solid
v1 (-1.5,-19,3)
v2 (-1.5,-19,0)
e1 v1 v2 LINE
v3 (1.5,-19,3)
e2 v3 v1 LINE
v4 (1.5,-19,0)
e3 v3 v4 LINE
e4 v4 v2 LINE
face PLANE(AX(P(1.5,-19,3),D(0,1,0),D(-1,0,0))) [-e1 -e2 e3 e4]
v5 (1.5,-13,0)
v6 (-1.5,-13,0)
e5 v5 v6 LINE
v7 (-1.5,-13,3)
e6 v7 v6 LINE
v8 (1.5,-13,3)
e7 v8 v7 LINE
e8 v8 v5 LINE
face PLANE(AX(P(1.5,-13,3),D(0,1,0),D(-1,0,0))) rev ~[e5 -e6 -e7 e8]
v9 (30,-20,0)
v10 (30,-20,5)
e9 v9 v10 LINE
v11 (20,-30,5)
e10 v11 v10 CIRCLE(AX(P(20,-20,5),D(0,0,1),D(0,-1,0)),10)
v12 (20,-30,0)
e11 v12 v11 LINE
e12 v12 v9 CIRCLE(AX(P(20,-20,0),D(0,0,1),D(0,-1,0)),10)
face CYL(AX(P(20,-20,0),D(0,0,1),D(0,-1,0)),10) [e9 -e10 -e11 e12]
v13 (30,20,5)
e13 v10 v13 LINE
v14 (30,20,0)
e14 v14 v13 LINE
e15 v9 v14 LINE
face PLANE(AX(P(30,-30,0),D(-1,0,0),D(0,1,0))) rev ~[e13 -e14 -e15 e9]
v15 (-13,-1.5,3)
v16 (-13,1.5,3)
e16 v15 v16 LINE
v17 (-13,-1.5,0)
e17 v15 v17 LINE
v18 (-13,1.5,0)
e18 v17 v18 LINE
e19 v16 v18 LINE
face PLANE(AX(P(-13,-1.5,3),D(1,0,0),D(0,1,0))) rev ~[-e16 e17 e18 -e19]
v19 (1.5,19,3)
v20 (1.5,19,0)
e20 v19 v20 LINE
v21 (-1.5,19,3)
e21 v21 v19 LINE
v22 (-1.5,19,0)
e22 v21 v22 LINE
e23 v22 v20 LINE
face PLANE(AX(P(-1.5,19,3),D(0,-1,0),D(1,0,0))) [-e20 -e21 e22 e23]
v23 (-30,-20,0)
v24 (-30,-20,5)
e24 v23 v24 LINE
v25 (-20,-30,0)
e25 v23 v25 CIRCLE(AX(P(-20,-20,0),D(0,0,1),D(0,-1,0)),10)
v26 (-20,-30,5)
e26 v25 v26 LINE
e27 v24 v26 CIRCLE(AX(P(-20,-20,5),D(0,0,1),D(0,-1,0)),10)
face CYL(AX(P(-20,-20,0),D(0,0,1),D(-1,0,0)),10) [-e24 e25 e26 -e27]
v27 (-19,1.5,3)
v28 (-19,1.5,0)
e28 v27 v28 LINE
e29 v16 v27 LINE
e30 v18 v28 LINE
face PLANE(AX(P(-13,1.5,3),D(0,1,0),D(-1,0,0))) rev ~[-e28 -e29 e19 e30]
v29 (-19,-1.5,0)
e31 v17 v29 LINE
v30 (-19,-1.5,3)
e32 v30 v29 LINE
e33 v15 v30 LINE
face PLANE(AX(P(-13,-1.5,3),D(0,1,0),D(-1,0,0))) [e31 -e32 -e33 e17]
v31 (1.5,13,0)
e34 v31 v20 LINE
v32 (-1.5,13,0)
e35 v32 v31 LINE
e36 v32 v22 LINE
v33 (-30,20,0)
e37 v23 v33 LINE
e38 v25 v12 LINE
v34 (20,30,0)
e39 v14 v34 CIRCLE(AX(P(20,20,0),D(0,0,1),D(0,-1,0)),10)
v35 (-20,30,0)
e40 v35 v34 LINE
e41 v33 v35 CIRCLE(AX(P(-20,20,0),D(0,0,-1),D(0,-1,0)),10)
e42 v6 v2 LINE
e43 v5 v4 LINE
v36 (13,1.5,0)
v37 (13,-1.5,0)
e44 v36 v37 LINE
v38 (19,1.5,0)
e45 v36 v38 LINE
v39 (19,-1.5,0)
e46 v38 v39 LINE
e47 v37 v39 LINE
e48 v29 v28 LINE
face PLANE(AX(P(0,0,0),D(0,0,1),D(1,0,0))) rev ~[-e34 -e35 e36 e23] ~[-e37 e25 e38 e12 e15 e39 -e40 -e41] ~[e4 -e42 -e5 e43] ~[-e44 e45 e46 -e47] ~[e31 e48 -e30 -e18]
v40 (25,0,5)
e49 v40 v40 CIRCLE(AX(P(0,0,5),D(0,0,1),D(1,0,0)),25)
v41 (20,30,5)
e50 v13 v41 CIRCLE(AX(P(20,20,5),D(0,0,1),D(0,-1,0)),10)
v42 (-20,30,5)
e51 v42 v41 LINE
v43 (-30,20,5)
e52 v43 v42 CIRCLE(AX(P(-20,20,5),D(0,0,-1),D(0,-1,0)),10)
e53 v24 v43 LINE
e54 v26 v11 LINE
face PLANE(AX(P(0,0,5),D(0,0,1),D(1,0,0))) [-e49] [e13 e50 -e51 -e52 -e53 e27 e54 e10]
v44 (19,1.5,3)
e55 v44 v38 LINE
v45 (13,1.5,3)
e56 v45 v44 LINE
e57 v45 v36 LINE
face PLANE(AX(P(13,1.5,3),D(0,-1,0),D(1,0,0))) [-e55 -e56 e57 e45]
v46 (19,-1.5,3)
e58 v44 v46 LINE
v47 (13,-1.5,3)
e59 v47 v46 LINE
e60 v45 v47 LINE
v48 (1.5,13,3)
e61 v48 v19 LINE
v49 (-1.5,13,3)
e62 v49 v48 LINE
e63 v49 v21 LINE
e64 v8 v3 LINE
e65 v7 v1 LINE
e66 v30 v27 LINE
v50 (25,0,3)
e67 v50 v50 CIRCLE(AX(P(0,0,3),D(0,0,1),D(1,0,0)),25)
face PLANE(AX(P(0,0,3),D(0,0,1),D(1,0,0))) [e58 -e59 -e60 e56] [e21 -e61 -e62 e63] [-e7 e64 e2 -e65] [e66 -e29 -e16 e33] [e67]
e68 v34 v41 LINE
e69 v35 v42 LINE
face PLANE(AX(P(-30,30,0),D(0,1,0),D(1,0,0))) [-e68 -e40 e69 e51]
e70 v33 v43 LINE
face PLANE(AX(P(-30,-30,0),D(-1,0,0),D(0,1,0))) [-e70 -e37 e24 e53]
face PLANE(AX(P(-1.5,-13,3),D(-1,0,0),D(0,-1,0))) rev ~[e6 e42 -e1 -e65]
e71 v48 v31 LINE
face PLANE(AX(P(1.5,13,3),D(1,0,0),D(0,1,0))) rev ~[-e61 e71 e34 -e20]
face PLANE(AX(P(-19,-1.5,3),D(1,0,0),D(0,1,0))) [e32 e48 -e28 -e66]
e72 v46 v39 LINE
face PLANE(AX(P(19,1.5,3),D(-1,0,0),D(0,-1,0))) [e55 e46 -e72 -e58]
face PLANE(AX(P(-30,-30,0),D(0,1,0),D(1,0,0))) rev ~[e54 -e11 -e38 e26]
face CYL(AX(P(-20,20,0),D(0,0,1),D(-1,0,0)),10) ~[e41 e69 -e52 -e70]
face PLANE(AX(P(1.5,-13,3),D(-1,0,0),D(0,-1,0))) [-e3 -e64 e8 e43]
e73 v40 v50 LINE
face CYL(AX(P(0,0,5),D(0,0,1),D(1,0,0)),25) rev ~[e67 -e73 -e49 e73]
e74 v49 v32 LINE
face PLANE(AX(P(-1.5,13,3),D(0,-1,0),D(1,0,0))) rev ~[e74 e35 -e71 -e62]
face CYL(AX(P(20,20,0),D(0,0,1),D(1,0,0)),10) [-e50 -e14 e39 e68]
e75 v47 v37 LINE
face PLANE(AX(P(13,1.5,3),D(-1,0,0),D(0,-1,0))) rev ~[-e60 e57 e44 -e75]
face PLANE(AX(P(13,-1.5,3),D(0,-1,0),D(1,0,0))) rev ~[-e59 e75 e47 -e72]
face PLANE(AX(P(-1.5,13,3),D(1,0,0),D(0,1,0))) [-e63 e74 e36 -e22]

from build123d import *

# Parameters (mm, degrees)
F0_W            = 60
F0_H            = 60
F1_DEPTH        = 5
F2_R            = 10
F3_R            = 25
F4_DEPTH        = 2
F5_W            = 3
F5_H            = 6
F6_DEPTH        = 3
F6_COPIES_COUNT = 4


# Not quite as in the source:
# - a pattern or mirror of a feature is missing from the dataset's text; its kind, count and spacing are read off the source's solid
# - a feature names something its author has since deleted; it is built from what else it names


with BuildPart() as f1:
    # F0 (on Top) → F1 (new body)
    with BuildSketch(Plane.XY):
        Rectangle(F0_W, F0_H)
    extrude(amount=F1_DEPTH)

    # F2
    f2_edges = [f1.edges().sort_by_distance(p)[0] for p in [
        (-30, 30, 2.5),
        (-30, -30, 2.5),
        (30, 30, 2.5),
        (30, -30, 2.5),
    ]]
    fillet(f2_edges, radius=F2_R)

    # F3 (on face) → F4 (cut)
    with BuildSketch(Plane.XY.offset(5)):
        Circle(F3_R)
    extrude(amount=-F4_DEPTH, mode=Mode.SUBTRACT)

    # F5 (on face) → F6 (cut)
    with BuildSketch(Plane.XY.offset(3)):
        with Locations((0, 16)):
            Rectangle(F5_W, F5_H)
    f6 = extrude(amount=-F6_DEPTH, mode=Mode.SUBTRACT)

    # F6_copies: F6 ×4 about axis
    f6_copies_axis = Axis((0, 0, 0), (0, 0, 1))
    for i in range(1, F6_COPIES_COUNT):
        add(f6.rotate(f6_copies_axis, i * 360 / F6_COPIES_COUNT), mode=Mode.SUBTRACT)


solid = f1.part
